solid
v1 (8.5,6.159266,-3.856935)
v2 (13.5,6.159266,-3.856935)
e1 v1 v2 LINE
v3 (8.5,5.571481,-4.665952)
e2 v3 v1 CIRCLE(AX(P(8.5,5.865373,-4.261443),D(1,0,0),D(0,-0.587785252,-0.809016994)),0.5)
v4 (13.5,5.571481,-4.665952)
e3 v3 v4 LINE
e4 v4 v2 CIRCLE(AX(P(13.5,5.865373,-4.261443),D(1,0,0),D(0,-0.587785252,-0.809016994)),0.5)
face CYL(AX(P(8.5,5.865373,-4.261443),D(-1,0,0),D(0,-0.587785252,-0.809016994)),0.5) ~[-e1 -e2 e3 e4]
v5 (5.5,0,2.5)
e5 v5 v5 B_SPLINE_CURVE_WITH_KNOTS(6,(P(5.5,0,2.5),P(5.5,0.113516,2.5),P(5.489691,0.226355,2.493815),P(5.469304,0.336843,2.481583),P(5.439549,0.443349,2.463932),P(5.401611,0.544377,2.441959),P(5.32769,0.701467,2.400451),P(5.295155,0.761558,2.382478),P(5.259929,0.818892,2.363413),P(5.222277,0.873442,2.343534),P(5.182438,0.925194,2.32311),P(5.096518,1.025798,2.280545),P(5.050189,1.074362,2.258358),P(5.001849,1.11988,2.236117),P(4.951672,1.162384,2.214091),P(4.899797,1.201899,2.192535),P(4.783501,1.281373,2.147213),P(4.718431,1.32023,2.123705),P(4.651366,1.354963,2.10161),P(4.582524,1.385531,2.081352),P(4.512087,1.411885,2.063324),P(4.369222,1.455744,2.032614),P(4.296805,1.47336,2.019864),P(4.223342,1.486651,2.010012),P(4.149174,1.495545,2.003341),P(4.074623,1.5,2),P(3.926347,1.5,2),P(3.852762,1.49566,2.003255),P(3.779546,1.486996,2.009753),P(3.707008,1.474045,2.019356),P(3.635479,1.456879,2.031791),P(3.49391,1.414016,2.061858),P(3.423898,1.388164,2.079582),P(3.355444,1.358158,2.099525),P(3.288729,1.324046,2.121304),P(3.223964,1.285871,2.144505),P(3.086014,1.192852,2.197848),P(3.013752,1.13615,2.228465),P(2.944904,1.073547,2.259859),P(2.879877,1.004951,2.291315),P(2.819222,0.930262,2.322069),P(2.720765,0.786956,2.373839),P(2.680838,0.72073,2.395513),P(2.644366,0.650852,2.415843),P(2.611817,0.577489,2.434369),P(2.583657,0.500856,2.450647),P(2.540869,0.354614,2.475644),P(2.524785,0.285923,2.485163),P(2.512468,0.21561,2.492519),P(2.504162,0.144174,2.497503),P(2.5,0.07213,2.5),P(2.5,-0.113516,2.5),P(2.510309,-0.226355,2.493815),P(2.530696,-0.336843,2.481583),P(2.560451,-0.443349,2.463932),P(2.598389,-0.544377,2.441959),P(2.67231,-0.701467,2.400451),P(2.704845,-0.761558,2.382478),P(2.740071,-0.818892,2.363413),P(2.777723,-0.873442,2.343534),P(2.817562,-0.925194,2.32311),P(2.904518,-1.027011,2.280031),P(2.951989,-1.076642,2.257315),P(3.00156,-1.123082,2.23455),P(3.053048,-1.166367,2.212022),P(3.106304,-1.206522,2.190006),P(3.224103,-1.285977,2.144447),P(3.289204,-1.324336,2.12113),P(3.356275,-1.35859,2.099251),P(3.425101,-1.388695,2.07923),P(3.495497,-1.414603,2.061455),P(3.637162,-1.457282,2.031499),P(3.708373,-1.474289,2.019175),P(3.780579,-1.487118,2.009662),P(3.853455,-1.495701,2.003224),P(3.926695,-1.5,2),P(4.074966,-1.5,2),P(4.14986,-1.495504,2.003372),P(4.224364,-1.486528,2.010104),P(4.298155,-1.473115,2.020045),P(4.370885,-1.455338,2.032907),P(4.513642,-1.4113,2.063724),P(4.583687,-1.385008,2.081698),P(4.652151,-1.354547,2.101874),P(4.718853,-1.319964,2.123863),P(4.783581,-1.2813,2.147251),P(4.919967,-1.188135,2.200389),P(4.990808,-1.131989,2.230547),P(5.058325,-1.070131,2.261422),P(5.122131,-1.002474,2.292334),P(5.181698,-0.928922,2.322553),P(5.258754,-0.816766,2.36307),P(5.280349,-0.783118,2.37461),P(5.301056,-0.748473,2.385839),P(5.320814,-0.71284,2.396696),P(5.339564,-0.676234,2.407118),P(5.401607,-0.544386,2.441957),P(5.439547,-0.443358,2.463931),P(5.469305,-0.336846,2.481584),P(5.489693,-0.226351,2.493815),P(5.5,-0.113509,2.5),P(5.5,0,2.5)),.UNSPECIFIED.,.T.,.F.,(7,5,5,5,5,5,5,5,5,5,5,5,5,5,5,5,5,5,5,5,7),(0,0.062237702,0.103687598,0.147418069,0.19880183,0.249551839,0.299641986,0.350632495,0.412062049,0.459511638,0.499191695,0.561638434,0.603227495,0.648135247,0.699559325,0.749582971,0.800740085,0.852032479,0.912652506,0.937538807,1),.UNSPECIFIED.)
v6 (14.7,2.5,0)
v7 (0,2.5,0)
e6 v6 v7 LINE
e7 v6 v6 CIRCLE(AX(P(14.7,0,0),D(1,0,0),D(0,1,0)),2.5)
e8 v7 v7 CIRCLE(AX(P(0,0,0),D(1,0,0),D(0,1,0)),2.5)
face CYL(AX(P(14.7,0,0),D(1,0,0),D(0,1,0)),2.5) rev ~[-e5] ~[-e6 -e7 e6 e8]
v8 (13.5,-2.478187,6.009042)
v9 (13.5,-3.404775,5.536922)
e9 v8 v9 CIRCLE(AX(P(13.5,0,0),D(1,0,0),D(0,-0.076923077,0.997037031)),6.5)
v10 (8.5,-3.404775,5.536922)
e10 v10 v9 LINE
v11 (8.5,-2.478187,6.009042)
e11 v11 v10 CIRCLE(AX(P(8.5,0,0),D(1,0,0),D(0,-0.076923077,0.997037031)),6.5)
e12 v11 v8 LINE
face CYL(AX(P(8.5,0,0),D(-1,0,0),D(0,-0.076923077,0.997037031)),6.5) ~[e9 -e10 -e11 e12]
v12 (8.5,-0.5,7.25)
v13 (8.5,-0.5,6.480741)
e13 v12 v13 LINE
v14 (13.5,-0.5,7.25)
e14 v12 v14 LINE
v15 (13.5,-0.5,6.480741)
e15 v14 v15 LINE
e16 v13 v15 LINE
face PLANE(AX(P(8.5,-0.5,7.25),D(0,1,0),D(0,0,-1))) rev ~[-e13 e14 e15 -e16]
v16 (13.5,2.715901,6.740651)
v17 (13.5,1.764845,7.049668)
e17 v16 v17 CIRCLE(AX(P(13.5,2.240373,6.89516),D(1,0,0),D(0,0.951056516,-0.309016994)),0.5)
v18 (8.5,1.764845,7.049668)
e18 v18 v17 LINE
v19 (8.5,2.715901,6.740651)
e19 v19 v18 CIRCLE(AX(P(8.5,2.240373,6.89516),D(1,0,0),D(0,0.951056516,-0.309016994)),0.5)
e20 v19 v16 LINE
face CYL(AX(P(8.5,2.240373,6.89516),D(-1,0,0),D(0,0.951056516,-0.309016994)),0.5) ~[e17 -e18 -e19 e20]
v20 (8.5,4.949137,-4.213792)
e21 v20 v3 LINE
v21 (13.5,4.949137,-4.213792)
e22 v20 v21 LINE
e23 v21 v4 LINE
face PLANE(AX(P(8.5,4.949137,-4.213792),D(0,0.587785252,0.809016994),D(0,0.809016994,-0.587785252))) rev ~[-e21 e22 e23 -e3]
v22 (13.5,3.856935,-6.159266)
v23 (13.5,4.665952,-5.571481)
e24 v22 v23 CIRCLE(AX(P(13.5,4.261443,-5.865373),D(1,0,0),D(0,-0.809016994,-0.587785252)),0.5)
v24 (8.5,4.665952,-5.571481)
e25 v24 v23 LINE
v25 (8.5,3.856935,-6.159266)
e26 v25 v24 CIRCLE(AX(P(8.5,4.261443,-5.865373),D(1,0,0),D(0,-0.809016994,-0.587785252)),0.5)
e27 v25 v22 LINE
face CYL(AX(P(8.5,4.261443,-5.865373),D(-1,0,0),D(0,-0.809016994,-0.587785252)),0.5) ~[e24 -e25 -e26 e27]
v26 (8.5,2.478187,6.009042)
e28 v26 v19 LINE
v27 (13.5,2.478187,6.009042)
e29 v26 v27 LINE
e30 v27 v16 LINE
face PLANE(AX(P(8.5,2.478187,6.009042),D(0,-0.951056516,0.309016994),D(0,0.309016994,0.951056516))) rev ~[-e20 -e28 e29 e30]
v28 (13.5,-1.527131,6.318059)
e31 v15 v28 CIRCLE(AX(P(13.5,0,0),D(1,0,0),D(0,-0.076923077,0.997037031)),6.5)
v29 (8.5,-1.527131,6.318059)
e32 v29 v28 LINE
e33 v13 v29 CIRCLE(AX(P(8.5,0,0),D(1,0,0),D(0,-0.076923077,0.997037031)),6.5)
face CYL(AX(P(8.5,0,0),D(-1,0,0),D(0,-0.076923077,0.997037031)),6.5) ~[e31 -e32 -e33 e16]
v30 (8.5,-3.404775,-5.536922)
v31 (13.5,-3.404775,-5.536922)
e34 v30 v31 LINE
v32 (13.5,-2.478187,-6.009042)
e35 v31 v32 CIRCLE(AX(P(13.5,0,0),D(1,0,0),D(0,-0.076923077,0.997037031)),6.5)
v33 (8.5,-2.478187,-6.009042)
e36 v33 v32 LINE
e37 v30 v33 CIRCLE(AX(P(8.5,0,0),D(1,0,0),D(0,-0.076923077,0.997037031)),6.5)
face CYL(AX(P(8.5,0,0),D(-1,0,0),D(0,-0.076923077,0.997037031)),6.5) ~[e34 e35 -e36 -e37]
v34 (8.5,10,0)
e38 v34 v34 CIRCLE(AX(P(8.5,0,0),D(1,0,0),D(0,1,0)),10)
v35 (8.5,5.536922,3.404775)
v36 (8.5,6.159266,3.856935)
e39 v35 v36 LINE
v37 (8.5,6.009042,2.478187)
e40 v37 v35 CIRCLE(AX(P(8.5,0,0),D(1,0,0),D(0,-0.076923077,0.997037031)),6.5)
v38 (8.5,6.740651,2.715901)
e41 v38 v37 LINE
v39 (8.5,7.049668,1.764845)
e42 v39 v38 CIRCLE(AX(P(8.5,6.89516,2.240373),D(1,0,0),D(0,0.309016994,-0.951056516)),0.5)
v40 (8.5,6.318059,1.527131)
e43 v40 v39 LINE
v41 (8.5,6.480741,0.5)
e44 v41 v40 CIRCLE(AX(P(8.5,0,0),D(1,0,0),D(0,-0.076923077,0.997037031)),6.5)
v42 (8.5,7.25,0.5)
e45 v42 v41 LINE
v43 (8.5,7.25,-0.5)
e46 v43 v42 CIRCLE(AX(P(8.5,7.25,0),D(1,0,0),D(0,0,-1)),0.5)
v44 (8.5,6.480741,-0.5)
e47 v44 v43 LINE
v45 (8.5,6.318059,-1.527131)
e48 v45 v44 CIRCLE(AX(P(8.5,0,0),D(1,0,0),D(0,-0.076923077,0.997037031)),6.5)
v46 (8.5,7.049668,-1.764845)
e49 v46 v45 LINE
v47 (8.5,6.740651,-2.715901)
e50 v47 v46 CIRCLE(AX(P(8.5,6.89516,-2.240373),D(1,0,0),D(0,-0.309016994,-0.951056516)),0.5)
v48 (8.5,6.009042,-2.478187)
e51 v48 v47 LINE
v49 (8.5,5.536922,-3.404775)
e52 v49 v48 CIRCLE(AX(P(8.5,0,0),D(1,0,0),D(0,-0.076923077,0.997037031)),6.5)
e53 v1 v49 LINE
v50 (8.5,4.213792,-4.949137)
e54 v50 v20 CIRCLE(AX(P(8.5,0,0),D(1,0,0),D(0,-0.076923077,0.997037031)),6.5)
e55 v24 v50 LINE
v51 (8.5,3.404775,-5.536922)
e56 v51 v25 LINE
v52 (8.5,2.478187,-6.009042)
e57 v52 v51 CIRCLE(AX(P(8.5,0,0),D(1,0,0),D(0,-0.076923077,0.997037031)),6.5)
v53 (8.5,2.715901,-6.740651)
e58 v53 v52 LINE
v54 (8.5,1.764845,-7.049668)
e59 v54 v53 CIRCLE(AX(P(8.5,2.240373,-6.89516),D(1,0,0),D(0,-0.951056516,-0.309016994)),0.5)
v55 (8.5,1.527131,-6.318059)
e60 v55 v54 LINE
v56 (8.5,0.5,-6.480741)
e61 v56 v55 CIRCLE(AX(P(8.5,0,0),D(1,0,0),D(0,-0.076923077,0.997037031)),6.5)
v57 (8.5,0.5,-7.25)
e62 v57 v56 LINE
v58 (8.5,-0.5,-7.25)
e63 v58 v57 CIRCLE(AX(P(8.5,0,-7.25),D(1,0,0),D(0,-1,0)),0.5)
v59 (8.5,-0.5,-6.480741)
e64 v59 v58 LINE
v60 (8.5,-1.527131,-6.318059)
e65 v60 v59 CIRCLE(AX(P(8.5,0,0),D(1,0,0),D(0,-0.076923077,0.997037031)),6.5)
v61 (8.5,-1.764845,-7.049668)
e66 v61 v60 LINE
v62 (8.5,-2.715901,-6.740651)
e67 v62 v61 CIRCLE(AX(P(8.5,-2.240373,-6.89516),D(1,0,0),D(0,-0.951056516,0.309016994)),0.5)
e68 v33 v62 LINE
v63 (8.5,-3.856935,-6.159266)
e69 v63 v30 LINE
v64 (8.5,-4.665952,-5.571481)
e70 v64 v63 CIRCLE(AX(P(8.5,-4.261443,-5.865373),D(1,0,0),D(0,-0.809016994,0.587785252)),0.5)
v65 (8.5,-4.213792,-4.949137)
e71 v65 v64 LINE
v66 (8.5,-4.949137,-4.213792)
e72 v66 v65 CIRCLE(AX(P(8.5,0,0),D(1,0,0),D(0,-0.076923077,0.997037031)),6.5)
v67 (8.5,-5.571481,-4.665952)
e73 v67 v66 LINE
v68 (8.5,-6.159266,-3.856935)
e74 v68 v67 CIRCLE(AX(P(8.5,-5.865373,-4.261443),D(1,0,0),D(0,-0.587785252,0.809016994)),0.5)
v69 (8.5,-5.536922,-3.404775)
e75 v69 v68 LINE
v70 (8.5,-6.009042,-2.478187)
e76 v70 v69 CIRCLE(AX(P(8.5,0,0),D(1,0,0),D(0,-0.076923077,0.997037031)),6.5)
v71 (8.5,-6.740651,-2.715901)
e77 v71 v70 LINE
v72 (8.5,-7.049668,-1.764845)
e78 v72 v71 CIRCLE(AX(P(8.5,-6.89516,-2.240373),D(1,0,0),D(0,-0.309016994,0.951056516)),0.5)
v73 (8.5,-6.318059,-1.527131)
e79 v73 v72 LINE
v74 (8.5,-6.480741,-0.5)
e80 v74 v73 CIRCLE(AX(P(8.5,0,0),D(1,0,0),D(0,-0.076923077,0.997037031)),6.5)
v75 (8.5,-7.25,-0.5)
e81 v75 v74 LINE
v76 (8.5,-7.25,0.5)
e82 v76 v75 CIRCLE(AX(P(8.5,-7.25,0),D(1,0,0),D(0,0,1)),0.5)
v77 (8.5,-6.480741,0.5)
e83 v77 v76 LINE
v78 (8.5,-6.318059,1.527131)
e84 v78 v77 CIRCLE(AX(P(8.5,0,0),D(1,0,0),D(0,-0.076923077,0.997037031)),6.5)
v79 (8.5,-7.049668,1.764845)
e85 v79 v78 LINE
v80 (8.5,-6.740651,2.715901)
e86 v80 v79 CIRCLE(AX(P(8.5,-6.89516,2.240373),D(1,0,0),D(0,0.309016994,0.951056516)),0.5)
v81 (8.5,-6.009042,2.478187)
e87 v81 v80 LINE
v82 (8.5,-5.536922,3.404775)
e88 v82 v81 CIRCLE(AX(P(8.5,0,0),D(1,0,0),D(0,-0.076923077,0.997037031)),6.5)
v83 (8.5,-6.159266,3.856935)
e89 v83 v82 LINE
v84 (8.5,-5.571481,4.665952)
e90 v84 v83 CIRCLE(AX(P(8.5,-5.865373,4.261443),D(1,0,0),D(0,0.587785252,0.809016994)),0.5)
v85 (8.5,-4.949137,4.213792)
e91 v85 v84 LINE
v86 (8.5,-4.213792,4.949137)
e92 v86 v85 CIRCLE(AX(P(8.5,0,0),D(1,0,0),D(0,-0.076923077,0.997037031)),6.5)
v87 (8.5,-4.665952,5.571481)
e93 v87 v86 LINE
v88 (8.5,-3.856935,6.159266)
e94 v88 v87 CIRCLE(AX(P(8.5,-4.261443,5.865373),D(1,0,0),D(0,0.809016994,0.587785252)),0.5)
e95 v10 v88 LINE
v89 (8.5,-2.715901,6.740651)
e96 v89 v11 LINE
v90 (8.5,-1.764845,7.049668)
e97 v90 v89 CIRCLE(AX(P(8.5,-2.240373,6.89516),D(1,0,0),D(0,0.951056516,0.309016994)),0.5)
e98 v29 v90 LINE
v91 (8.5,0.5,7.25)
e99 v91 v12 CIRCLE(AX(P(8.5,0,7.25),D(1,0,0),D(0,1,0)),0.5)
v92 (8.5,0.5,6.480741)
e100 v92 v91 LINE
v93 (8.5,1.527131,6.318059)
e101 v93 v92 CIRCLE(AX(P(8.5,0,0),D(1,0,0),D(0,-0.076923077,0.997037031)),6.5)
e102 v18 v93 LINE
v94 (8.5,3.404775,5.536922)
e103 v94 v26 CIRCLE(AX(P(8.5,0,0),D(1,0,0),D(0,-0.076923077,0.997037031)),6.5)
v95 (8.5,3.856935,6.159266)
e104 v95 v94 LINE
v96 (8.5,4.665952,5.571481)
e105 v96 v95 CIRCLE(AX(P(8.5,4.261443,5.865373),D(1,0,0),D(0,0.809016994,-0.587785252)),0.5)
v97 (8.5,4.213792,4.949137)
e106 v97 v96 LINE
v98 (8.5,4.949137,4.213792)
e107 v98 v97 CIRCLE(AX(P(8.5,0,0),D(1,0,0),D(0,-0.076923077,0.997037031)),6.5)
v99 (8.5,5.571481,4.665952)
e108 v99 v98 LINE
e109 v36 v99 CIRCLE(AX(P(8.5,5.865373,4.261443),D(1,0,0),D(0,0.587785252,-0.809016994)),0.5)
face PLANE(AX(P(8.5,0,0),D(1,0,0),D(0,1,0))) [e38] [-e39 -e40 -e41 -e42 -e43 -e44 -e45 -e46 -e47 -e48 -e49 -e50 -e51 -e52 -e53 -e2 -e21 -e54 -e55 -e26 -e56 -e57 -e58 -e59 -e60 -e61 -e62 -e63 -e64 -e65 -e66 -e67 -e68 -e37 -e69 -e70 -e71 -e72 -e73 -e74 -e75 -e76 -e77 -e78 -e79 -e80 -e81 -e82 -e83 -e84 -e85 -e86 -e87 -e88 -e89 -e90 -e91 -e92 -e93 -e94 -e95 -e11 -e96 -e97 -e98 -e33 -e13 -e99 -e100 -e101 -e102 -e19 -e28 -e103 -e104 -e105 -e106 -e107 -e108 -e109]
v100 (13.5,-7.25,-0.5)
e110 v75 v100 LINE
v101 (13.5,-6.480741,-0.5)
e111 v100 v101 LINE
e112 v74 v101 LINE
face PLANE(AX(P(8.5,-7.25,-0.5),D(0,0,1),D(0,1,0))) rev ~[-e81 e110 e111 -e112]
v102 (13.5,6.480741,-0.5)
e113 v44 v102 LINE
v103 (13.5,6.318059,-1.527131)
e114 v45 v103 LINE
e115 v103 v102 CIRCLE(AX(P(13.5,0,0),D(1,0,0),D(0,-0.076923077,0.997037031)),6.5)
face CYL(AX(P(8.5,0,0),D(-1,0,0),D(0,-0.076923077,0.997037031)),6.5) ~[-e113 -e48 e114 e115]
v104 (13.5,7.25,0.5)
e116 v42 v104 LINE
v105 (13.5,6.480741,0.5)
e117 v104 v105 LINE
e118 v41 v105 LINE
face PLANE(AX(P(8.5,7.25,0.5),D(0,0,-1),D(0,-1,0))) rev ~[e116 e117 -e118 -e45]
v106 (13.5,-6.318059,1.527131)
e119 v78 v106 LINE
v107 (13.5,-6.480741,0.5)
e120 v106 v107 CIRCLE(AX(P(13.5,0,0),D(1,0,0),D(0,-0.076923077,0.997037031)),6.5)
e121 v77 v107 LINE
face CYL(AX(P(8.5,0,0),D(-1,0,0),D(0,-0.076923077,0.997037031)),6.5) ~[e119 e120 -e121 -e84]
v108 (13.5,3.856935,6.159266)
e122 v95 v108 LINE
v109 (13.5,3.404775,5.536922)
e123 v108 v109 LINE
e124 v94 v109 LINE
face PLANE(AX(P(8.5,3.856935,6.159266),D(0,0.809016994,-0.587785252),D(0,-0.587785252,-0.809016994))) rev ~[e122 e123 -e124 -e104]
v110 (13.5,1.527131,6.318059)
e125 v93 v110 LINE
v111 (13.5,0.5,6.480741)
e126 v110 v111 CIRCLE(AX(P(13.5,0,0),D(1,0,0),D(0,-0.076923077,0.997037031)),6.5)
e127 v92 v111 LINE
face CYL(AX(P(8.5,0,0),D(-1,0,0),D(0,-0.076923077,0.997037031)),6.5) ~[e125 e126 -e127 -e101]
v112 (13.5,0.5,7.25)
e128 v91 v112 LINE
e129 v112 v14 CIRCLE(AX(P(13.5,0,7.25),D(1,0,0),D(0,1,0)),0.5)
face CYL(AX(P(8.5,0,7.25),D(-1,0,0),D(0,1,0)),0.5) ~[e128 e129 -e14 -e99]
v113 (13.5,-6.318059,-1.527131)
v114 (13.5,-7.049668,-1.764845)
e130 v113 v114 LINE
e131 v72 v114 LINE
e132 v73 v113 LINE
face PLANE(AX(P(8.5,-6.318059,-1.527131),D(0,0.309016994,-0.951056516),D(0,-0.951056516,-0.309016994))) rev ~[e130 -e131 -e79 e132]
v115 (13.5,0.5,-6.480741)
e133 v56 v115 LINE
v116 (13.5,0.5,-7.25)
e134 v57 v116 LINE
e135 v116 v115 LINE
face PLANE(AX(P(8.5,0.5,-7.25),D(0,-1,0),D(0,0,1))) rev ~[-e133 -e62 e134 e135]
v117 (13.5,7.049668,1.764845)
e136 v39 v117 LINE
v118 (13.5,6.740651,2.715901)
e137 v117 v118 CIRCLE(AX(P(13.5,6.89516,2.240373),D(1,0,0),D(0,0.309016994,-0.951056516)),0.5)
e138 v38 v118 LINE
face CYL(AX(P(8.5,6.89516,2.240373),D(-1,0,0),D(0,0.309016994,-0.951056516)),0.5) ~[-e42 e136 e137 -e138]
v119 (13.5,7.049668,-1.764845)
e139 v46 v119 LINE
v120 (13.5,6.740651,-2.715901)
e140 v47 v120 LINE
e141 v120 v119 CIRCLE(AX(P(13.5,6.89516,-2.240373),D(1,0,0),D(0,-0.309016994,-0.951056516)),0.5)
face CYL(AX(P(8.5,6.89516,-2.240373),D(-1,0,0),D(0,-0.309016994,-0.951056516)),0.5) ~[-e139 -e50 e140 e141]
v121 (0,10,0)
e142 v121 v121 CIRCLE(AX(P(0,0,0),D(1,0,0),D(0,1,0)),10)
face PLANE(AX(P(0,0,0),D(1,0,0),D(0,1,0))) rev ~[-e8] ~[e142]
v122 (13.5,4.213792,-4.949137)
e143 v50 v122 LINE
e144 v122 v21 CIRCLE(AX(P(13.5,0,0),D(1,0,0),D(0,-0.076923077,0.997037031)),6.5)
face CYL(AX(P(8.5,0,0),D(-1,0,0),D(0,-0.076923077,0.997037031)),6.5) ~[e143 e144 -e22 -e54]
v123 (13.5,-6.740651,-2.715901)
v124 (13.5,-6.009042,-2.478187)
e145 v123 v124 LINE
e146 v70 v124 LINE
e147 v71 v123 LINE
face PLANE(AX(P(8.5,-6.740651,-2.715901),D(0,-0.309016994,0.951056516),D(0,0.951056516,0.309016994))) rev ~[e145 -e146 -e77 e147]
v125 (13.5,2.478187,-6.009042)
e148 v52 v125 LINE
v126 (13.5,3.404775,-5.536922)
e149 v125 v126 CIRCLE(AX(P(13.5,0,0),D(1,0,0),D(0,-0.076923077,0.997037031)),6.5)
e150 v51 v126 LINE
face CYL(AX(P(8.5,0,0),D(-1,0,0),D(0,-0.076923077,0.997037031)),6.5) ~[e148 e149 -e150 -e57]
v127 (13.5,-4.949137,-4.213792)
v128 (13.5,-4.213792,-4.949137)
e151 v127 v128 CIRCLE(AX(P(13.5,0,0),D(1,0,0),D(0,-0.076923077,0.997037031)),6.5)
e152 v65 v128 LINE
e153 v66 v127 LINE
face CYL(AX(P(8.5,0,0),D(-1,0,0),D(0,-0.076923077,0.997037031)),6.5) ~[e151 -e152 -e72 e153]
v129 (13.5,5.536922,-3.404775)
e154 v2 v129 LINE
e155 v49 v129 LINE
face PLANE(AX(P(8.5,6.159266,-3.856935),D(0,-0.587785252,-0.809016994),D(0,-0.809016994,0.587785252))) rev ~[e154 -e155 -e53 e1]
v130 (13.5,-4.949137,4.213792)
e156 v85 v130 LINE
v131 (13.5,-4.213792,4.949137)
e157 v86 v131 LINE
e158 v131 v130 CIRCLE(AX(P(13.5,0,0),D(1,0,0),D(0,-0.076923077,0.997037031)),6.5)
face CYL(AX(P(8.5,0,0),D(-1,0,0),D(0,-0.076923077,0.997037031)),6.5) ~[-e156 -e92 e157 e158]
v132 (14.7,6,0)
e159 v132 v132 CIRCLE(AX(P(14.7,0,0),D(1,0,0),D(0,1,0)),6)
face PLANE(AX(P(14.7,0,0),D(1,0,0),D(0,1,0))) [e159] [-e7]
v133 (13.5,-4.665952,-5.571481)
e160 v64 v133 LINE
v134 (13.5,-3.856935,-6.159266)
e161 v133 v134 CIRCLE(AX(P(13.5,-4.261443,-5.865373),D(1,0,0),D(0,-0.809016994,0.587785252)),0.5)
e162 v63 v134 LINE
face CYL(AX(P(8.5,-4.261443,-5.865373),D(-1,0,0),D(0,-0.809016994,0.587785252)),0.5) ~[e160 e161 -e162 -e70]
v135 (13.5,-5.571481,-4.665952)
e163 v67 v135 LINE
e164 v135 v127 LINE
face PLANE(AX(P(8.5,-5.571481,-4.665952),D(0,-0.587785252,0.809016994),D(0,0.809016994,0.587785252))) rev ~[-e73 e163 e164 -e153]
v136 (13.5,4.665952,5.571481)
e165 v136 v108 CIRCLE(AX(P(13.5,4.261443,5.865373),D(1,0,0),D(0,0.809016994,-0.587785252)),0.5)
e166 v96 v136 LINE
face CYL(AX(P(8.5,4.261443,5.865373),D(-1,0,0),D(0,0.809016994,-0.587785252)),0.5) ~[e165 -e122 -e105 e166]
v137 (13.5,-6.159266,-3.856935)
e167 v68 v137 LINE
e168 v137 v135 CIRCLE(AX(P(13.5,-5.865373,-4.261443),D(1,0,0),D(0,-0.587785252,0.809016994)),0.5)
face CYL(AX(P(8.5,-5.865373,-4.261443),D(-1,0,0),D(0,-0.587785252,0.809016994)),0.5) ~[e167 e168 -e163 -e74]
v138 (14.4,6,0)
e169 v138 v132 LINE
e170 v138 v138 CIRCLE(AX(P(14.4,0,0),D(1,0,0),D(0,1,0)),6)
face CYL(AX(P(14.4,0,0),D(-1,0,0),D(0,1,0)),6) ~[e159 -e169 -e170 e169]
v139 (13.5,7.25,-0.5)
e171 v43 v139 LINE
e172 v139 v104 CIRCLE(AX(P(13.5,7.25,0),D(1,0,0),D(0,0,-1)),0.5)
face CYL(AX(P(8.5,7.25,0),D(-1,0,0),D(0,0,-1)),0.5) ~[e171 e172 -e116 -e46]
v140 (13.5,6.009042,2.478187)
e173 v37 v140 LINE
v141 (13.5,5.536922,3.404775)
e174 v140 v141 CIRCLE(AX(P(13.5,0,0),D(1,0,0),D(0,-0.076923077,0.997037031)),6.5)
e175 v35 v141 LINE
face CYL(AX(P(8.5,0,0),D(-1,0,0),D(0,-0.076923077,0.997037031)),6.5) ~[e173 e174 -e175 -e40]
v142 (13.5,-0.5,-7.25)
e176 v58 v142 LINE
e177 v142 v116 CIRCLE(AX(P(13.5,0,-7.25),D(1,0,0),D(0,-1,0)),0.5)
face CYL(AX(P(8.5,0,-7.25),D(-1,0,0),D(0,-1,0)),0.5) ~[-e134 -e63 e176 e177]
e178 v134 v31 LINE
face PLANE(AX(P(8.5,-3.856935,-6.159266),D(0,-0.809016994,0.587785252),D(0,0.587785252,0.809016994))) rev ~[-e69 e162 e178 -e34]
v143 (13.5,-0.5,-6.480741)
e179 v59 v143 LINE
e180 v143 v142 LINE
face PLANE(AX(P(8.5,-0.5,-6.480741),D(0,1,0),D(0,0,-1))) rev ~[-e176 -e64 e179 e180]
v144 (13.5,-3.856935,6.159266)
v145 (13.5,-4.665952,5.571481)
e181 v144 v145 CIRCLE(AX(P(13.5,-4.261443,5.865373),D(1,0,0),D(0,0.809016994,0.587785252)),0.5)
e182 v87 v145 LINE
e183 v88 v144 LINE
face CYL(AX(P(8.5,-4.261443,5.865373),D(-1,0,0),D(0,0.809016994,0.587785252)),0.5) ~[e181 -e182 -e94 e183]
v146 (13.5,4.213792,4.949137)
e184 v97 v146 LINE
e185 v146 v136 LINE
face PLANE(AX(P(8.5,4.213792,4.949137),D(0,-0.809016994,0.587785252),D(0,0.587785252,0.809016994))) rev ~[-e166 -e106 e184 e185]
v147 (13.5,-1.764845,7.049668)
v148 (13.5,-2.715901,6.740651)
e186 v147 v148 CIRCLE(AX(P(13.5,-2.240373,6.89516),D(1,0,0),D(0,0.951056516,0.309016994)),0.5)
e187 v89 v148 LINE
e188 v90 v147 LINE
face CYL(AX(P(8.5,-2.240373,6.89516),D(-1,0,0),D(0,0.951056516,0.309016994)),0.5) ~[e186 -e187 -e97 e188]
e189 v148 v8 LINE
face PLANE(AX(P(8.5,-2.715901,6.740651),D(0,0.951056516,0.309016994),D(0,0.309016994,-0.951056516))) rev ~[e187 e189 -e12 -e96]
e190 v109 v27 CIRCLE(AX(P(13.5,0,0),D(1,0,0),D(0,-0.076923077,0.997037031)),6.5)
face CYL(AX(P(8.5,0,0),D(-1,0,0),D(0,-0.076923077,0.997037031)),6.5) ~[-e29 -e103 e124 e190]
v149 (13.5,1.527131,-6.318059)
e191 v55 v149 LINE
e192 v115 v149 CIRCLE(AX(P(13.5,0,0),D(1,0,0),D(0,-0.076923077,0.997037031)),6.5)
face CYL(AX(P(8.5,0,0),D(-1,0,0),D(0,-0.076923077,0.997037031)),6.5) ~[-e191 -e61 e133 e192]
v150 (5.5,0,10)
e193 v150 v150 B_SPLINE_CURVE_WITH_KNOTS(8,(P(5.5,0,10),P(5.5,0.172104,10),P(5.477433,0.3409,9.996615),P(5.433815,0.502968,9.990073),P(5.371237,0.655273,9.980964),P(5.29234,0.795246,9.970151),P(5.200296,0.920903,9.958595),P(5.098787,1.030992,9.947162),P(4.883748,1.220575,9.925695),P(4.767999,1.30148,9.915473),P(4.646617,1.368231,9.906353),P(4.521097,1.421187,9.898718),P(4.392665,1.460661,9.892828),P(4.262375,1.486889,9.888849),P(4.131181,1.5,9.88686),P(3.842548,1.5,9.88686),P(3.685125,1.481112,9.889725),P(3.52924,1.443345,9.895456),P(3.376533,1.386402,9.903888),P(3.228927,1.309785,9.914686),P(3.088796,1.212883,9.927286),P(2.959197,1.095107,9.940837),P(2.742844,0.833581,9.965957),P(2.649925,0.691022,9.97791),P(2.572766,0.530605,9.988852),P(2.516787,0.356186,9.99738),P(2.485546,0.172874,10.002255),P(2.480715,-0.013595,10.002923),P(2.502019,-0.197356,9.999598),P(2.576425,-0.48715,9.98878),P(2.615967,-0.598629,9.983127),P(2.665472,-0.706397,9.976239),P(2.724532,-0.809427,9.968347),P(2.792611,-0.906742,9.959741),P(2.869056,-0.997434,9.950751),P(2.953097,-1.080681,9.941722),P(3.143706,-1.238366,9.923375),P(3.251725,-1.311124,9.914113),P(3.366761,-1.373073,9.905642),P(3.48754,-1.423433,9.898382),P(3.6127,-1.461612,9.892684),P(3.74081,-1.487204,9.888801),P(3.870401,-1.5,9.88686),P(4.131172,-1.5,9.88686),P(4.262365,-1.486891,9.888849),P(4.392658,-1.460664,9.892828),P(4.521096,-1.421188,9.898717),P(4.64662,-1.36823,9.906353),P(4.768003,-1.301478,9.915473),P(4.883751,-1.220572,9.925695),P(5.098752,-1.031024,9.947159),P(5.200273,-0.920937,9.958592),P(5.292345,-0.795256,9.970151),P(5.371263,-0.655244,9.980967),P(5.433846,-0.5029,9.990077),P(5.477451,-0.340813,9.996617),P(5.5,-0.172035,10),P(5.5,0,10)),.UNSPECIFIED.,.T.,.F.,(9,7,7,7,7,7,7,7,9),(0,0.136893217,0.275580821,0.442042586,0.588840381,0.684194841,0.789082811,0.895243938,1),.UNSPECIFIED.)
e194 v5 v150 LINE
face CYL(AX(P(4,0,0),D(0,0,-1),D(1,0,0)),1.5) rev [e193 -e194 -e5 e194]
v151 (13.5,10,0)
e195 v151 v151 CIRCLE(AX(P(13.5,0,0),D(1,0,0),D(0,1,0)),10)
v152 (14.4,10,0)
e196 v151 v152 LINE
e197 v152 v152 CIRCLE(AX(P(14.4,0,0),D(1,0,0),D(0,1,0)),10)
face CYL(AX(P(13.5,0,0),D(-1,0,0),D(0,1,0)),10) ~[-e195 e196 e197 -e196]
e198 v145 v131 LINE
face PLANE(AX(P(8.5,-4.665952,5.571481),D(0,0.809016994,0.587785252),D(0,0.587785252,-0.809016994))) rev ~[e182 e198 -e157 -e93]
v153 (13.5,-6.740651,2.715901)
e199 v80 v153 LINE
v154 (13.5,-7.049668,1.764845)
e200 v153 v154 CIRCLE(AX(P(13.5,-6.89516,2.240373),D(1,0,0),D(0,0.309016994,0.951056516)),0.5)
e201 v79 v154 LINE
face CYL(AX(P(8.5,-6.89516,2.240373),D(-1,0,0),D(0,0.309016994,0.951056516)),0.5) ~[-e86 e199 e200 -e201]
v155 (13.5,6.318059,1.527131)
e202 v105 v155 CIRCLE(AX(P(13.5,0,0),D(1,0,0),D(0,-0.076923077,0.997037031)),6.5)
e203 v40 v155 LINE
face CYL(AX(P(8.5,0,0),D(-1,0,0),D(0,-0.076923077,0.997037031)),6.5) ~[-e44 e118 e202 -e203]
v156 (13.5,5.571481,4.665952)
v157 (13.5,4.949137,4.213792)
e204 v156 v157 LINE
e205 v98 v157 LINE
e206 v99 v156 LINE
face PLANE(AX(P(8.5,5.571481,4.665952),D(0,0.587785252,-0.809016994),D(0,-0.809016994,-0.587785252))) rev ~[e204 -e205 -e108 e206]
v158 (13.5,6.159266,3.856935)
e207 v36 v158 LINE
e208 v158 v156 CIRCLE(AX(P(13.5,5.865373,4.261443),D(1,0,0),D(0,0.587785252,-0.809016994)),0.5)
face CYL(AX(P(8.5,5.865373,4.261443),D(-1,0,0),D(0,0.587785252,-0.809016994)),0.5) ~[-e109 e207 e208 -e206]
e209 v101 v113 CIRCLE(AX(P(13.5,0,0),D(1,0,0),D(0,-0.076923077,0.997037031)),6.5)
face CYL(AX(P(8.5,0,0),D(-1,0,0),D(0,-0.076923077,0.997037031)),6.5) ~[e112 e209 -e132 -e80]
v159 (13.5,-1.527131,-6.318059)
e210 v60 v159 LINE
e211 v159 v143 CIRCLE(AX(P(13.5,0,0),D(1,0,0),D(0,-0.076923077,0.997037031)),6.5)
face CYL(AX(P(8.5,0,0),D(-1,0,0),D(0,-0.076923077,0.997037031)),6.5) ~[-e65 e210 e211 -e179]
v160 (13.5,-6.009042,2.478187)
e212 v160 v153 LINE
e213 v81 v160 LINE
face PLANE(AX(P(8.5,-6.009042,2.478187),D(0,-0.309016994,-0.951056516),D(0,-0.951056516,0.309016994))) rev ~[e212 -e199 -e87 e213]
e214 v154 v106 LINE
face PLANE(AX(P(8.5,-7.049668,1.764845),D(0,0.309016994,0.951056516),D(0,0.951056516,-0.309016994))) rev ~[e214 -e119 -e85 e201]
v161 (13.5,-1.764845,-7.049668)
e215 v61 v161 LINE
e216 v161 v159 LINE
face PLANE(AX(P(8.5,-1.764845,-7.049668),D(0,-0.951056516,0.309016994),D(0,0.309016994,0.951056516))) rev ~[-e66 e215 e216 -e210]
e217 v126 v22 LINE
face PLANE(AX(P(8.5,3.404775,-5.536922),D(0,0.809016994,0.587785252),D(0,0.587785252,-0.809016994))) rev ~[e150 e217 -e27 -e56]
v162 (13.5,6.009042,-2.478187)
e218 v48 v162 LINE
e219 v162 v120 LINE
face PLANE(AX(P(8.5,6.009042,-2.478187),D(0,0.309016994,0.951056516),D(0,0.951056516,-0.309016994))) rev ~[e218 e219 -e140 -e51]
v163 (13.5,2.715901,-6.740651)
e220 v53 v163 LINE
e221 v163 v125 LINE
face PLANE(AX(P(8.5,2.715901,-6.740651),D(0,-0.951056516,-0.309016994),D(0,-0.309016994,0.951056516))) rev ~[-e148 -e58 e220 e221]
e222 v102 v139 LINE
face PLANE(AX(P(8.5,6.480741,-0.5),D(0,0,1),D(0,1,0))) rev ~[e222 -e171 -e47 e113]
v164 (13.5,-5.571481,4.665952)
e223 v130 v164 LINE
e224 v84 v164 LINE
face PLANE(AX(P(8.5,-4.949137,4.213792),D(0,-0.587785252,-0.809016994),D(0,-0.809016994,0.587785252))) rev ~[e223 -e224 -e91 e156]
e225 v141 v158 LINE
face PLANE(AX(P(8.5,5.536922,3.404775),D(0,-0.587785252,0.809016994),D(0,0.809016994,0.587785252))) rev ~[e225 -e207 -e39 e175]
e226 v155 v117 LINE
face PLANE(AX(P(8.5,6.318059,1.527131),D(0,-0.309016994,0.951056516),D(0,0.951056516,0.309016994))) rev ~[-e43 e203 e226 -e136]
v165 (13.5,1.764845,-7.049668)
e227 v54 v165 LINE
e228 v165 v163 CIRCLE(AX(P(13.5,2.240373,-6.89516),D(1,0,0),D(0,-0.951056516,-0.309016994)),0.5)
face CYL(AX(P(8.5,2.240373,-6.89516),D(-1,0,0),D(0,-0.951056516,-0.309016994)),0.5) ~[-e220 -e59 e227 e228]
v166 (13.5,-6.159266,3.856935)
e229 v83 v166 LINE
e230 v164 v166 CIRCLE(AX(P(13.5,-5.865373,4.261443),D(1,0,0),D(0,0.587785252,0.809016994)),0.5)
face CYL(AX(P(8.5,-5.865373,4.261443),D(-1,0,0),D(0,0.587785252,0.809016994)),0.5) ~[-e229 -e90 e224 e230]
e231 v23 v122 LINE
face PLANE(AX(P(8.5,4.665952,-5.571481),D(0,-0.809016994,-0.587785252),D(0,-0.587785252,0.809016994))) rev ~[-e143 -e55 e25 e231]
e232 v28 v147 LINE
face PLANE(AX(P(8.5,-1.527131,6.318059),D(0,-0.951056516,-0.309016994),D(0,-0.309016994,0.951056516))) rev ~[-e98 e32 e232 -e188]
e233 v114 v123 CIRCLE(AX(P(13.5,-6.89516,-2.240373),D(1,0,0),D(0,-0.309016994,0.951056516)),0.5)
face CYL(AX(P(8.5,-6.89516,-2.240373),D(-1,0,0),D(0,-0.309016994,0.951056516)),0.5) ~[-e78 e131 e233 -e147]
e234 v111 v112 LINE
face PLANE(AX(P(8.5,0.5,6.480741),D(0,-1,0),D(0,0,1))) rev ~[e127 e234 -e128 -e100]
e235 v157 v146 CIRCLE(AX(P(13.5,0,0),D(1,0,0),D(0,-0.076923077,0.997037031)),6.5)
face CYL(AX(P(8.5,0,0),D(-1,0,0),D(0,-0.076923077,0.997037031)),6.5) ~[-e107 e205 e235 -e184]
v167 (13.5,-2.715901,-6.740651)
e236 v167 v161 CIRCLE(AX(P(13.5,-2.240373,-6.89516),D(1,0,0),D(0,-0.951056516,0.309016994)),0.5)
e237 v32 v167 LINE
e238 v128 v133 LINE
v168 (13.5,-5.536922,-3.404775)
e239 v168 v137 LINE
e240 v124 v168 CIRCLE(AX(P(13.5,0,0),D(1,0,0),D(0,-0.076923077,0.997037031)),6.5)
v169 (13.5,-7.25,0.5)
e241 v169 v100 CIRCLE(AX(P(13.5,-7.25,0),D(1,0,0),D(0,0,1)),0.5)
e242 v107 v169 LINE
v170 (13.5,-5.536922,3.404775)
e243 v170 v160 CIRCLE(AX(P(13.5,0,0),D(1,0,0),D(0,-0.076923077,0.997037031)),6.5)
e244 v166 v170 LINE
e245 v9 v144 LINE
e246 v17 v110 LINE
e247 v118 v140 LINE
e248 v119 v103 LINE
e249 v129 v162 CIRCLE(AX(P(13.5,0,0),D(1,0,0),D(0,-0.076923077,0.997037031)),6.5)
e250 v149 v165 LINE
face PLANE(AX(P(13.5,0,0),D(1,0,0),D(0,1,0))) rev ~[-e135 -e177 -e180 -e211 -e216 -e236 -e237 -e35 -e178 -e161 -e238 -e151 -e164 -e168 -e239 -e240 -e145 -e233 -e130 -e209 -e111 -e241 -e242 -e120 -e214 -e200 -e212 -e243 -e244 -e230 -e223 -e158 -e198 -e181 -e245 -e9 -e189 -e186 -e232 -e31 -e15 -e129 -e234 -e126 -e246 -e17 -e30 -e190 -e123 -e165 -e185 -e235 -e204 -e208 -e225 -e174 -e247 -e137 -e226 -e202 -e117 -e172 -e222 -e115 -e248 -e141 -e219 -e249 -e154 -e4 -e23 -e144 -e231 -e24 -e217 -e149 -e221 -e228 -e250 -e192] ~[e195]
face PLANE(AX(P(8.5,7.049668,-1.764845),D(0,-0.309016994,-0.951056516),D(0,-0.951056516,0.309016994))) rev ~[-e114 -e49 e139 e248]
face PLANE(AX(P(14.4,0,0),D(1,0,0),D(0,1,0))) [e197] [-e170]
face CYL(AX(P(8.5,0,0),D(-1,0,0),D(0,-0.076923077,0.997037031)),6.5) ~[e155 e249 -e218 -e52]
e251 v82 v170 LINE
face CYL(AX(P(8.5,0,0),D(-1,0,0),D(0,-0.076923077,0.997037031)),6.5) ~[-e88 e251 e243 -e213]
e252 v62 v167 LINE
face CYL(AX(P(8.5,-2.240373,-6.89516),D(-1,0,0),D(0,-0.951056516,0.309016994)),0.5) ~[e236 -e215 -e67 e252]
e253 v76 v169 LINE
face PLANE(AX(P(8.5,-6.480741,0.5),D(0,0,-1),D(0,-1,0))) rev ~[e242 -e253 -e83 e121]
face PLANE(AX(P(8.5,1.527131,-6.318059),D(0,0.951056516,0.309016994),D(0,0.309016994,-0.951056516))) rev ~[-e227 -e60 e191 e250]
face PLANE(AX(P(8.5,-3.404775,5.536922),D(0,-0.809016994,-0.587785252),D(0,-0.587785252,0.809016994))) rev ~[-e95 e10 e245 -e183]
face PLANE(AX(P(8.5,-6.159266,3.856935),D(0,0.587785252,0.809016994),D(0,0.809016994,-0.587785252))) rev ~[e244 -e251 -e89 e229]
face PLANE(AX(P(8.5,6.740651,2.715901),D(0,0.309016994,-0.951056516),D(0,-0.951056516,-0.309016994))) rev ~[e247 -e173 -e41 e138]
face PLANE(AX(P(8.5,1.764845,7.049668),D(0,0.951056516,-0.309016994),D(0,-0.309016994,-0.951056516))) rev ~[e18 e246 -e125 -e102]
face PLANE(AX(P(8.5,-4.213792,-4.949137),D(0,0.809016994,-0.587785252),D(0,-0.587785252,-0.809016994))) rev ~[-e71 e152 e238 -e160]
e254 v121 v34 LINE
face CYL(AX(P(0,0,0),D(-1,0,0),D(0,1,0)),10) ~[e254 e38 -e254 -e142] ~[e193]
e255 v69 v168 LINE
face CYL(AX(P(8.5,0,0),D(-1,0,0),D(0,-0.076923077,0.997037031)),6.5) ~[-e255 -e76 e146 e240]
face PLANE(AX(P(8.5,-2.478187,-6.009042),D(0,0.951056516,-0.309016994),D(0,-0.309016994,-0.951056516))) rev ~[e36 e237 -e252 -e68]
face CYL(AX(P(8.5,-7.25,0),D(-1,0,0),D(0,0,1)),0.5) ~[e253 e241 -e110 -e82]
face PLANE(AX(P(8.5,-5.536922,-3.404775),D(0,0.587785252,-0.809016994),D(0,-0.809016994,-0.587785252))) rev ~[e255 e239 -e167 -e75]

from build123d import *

# Parameters (mm, degrees)
F0_R            = 10
F1_DEPTH        = 8.5
F3_DEPTH        = 5
F3_COPIES_COUNT = 20
F5_R            = 10
F6_DEPTH        = 0.9
F7_R            = 6
F8_DEPTH        = 0.3
F9_R            = 2.5
F10_DEPTH       = 14.7
F11_R           = 1.5
F12_REACH       = 14.2436406871


# Not quite as in the source:
# - a pattern or mirror of a feature is missing from the dataset's text; its kind, count and spacing are read off the source's solid


with BuildPart() as f1:
    # F0 (on Right) → F1 (new body)
    with BuildSketch(Plane.YZ):
        Circle(F0_R)
    extrude(amount=F1_DEPTH)

    # F2 (on face) → F3 (join)
    with BuildSketch(Plane.YZ.offset(8.5)):
        with BuildLine():
            Line((0.5, 6.4807406984), (0.5, 7.25))
            ThreePointArc((0.5, 7.25), (0, 7.75), (-0.5, 7.25))
            Line((-0.5, 7.25), (-0.5, 6.4807406984))
            ThreePointArc((-0.5, 6.4807406984), (0, -6.5), (0.5, 6.4807406984))
        make_face()
    f3 = extrude(amount=F3_DEPTH)

    # F3_copies: F3 ×20 about axis
    f3_copies_axis = Axis((0, 0, 0), (1, 0, 0))
    for i in range(1, F3_COPIES_COUNT):
        add(f3.rotate(f3_copies_axis, i * 360 / F3_COPIES_COUNT))

    # F5 (on face) → F6 (join)
    with BuildSketch(Plane.YZ.offset(13.5)):
        Circle(F5_R)
    extrude(amount=F6_DEPTH)

    # F7 (on face) → F8 (join)
    with BuildSketch(Plane.YZ.offset(14.4)):
        Circle(F7_R)
    extrude(amount=F8_DEPTH)

    # F9 (on face) → F10 (cut, through all)
    with BuildSketch(Plane.YZ.offset(14.7)):
        Circle(F9_R)
    extrude(amount=-F10_DEPTH, mode=Mode.SUBTRACT)

    f12_end = f1.faces().sort_by_distance((4.25, -10, 0))[0]
    # F11 (on Top) → F12 (cut, up to a face of the model that its end follows)
    with BuildSketch(Plane.XY):
        with Locations((4, 0)):
            Circle(F11_R)
    f12_long = extrude(amount=F12_REACH, mode=Mode.PRIVATE)
    add(split(f12_long, bisect_by=f12_end, keep=Keep.BOTTOM, mode=Mode.PRIVATE), mode=Mode.SUBTRACT)


solid = f1.part
